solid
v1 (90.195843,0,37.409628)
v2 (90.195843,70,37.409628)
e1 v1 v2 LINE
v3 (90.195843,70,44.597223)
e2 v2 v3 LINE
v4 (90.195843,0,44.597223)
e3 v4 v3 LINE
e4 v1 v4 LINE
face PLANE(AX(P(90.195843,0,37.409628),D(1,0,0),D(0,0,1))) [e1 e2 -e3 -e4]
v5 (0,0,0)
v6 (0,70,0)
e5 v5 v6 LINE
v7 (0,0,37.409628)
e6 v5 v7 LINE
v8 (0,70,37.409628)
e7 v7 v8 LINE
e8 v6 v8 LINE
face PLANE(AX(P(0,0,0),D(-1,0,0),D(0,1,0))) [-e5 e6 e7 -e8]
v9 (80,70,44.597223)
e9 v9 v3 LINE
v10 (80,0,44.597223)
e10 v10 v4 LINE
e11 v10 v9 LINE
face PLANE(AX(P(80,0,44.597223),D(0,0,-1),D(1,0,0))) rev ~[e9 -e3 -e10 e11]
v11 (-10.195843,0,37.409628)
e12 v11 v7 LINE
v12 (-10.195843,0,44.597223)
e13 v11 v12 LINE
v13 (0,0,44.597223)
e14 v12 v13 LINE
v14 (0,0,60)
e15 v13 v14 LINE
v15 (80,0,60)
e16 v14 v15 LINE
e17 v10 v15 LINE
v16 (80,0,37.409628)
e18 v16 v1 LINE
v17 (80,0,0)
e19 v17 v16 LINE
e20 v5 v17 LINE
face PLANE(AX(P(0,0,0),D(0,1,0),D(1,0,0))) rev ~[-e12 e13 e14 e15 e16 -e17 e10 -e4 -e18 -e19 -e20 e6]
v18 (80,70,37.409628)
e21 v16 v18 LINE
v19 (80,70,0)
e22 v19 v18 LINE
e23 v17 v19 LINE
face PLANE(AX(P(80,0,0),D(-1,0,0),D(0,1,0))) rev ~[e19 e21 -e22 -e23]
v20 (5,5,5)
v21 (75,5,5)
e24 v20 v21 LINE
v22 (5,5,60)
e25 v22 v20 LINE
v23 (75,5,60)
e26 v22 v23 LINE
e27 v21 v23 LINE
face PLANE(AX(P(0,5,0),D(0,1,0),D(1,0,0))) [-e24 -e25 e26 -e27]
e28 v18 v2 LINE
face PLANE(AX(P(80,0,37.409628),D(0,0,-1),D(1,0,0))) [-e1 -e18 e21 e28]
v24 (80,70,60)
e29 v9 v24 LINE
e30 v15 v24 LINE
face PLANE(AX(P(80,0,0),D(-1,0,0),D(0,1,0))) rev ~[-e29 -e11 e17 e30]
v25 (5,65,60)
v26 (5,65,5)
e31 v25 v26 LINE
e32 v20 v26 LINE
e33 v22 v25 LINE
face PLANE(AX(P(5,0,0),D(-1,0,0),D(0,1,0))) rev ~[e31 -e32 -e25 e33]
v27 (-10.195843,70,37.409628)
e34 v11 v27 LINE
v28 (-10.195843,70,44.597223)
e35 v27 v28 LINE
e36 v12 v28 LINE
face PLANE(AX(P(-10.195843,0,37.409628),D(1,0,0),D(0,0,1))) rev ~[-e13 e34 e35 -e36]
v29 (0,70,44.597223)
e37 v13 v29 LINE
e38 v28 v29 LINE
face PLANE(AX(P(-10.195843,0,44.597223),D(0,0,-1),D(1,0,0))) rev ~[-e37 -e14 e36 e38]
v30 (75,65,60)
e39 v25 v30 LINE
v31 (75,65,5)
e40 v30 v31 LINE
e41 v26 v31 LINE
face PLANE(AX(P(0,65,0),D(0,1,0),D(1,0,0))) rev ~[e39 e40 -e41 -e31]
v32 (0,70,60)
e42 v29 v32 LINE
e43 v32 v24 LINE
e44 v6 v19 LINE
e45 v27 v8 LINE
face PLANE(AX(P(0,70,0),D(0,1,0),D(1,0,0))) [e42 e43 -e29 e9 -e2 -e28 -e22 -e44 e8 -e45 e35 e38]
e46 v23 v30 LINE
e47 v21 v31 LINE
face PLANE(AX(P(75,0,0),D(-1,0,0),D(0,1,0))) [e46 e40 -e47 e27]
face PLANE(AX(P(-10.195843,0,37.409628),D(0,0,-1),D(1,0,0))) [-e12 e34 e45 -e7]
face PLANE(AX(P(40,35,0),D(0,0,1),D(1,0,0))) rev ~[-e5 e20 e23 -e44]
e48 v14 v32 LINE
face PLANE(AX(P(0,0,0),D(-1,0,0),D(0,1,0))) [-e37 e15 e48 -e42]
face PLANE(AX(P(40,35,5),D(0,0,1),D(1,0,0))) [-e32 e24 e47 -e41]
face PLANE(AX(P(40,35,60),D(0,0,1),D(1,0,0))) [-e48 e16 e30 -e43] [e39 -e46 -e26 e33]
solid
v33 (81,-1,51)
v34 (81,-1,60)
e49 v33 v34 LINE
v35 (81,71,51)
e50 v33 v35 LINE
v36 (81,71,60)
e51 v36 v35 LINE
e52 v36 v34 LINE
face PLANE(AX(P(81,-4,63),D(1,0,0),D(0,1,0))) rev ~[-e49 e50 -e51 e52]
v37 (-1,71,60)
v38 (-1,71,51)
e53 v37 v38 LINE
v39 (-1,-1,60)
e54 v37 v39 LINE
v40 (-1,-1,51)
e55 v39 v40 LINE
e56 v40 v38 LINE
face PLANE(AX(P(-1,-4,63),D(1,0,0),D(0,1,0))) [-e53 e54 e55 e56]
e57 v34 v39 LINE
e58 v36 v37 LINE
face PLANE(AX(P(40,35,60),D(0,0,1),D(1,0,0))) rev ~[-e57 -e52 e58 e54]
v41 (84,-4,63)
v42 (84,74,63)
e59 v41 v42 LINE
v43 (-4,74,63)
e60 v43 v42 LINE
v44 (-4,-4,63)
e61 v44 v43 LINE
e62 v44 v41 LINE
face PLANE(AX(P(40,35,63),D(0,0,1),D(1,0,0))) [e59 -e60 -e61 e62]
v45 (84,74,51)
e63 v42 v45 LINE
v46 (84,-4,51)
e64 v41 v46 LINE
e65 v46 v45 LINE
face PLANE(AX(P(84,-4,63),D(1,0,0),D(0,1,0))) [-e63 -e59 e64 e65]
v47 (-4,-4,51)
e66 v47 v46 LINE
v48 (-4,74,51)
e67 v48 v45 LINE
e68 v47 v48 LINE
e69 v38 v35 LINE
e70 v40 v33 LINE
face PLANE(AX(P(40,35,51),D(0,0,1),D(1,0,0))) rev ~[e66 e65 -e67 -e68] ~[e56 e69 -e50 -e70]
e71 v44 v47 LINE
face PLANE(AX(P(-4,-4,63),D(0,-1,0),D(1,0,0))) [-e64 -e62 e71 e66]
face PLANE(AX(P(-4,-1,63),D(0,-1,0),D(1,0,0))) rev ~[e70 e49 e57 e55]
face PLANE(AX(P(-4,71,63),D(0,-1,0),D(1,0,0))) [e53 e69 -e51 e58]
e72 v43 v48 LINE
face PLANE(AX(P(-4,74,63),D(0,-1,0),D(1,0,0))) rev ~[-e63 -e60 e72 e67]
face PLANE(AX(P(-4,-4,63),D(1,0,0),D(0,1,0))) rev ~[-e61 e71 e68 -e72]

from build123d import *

# Parameters (mm, degrees)
F0_W     = 80
F0_H     = 70
F1_DEPTH = 60
F2_T     = -5
F4_W     = 88
F4_H     = 78
F5_DEPTH = 12
F6_T     = -3
F7_W     = 10.1958429441
F7_H     = 7.1875955909
F8_DEPTH = 70


with BuildPart() as f1:
    # F0 (on Top) → F1 (new body)
    with BuildSketch(Plane.XY):
        with Locations((40, 35)):
            Rectangle(F0_W, F0_H)
    extrude(amount=F1_DEPTH)

    # F2
    f2_openings = [f1.faces().sort_by_distance(p)[0] for p in [
        (40, 35, 60),
    ]]
    offset(amount=F2_T, openings=f2_openings)

    # F7 (on face) → F8 (join, through all)
    with BuildSketch(Plane.XZ):
        with Locations((-5.097921472, 41.0034256056)):
            Rectangle(F7_W, F7_H)
        with Locations((85.097921472, 41.0034256056)):
            Rectangle(F7_W, F7_H)
    extrude(amount=-F8_DEPTH)


with BuildPart() as f5:
    # F4 (on offset) → F5 (new body)
    with BuildSketch(Plane.XY.offset(63)):
        with Locations((40, 35)):
            Rectangle(F4_W, F4_H)
    extrude(amount=-F5_DEPTH)

    # F6
    f6_openings = [f5.faces().sort_by_distance(p)[0] for p in [
        (40, 35, 51),
    ]]
    offset(amount=F6_T, openings=f6_openings)


solid = Compound([f1.part, f5.part])
